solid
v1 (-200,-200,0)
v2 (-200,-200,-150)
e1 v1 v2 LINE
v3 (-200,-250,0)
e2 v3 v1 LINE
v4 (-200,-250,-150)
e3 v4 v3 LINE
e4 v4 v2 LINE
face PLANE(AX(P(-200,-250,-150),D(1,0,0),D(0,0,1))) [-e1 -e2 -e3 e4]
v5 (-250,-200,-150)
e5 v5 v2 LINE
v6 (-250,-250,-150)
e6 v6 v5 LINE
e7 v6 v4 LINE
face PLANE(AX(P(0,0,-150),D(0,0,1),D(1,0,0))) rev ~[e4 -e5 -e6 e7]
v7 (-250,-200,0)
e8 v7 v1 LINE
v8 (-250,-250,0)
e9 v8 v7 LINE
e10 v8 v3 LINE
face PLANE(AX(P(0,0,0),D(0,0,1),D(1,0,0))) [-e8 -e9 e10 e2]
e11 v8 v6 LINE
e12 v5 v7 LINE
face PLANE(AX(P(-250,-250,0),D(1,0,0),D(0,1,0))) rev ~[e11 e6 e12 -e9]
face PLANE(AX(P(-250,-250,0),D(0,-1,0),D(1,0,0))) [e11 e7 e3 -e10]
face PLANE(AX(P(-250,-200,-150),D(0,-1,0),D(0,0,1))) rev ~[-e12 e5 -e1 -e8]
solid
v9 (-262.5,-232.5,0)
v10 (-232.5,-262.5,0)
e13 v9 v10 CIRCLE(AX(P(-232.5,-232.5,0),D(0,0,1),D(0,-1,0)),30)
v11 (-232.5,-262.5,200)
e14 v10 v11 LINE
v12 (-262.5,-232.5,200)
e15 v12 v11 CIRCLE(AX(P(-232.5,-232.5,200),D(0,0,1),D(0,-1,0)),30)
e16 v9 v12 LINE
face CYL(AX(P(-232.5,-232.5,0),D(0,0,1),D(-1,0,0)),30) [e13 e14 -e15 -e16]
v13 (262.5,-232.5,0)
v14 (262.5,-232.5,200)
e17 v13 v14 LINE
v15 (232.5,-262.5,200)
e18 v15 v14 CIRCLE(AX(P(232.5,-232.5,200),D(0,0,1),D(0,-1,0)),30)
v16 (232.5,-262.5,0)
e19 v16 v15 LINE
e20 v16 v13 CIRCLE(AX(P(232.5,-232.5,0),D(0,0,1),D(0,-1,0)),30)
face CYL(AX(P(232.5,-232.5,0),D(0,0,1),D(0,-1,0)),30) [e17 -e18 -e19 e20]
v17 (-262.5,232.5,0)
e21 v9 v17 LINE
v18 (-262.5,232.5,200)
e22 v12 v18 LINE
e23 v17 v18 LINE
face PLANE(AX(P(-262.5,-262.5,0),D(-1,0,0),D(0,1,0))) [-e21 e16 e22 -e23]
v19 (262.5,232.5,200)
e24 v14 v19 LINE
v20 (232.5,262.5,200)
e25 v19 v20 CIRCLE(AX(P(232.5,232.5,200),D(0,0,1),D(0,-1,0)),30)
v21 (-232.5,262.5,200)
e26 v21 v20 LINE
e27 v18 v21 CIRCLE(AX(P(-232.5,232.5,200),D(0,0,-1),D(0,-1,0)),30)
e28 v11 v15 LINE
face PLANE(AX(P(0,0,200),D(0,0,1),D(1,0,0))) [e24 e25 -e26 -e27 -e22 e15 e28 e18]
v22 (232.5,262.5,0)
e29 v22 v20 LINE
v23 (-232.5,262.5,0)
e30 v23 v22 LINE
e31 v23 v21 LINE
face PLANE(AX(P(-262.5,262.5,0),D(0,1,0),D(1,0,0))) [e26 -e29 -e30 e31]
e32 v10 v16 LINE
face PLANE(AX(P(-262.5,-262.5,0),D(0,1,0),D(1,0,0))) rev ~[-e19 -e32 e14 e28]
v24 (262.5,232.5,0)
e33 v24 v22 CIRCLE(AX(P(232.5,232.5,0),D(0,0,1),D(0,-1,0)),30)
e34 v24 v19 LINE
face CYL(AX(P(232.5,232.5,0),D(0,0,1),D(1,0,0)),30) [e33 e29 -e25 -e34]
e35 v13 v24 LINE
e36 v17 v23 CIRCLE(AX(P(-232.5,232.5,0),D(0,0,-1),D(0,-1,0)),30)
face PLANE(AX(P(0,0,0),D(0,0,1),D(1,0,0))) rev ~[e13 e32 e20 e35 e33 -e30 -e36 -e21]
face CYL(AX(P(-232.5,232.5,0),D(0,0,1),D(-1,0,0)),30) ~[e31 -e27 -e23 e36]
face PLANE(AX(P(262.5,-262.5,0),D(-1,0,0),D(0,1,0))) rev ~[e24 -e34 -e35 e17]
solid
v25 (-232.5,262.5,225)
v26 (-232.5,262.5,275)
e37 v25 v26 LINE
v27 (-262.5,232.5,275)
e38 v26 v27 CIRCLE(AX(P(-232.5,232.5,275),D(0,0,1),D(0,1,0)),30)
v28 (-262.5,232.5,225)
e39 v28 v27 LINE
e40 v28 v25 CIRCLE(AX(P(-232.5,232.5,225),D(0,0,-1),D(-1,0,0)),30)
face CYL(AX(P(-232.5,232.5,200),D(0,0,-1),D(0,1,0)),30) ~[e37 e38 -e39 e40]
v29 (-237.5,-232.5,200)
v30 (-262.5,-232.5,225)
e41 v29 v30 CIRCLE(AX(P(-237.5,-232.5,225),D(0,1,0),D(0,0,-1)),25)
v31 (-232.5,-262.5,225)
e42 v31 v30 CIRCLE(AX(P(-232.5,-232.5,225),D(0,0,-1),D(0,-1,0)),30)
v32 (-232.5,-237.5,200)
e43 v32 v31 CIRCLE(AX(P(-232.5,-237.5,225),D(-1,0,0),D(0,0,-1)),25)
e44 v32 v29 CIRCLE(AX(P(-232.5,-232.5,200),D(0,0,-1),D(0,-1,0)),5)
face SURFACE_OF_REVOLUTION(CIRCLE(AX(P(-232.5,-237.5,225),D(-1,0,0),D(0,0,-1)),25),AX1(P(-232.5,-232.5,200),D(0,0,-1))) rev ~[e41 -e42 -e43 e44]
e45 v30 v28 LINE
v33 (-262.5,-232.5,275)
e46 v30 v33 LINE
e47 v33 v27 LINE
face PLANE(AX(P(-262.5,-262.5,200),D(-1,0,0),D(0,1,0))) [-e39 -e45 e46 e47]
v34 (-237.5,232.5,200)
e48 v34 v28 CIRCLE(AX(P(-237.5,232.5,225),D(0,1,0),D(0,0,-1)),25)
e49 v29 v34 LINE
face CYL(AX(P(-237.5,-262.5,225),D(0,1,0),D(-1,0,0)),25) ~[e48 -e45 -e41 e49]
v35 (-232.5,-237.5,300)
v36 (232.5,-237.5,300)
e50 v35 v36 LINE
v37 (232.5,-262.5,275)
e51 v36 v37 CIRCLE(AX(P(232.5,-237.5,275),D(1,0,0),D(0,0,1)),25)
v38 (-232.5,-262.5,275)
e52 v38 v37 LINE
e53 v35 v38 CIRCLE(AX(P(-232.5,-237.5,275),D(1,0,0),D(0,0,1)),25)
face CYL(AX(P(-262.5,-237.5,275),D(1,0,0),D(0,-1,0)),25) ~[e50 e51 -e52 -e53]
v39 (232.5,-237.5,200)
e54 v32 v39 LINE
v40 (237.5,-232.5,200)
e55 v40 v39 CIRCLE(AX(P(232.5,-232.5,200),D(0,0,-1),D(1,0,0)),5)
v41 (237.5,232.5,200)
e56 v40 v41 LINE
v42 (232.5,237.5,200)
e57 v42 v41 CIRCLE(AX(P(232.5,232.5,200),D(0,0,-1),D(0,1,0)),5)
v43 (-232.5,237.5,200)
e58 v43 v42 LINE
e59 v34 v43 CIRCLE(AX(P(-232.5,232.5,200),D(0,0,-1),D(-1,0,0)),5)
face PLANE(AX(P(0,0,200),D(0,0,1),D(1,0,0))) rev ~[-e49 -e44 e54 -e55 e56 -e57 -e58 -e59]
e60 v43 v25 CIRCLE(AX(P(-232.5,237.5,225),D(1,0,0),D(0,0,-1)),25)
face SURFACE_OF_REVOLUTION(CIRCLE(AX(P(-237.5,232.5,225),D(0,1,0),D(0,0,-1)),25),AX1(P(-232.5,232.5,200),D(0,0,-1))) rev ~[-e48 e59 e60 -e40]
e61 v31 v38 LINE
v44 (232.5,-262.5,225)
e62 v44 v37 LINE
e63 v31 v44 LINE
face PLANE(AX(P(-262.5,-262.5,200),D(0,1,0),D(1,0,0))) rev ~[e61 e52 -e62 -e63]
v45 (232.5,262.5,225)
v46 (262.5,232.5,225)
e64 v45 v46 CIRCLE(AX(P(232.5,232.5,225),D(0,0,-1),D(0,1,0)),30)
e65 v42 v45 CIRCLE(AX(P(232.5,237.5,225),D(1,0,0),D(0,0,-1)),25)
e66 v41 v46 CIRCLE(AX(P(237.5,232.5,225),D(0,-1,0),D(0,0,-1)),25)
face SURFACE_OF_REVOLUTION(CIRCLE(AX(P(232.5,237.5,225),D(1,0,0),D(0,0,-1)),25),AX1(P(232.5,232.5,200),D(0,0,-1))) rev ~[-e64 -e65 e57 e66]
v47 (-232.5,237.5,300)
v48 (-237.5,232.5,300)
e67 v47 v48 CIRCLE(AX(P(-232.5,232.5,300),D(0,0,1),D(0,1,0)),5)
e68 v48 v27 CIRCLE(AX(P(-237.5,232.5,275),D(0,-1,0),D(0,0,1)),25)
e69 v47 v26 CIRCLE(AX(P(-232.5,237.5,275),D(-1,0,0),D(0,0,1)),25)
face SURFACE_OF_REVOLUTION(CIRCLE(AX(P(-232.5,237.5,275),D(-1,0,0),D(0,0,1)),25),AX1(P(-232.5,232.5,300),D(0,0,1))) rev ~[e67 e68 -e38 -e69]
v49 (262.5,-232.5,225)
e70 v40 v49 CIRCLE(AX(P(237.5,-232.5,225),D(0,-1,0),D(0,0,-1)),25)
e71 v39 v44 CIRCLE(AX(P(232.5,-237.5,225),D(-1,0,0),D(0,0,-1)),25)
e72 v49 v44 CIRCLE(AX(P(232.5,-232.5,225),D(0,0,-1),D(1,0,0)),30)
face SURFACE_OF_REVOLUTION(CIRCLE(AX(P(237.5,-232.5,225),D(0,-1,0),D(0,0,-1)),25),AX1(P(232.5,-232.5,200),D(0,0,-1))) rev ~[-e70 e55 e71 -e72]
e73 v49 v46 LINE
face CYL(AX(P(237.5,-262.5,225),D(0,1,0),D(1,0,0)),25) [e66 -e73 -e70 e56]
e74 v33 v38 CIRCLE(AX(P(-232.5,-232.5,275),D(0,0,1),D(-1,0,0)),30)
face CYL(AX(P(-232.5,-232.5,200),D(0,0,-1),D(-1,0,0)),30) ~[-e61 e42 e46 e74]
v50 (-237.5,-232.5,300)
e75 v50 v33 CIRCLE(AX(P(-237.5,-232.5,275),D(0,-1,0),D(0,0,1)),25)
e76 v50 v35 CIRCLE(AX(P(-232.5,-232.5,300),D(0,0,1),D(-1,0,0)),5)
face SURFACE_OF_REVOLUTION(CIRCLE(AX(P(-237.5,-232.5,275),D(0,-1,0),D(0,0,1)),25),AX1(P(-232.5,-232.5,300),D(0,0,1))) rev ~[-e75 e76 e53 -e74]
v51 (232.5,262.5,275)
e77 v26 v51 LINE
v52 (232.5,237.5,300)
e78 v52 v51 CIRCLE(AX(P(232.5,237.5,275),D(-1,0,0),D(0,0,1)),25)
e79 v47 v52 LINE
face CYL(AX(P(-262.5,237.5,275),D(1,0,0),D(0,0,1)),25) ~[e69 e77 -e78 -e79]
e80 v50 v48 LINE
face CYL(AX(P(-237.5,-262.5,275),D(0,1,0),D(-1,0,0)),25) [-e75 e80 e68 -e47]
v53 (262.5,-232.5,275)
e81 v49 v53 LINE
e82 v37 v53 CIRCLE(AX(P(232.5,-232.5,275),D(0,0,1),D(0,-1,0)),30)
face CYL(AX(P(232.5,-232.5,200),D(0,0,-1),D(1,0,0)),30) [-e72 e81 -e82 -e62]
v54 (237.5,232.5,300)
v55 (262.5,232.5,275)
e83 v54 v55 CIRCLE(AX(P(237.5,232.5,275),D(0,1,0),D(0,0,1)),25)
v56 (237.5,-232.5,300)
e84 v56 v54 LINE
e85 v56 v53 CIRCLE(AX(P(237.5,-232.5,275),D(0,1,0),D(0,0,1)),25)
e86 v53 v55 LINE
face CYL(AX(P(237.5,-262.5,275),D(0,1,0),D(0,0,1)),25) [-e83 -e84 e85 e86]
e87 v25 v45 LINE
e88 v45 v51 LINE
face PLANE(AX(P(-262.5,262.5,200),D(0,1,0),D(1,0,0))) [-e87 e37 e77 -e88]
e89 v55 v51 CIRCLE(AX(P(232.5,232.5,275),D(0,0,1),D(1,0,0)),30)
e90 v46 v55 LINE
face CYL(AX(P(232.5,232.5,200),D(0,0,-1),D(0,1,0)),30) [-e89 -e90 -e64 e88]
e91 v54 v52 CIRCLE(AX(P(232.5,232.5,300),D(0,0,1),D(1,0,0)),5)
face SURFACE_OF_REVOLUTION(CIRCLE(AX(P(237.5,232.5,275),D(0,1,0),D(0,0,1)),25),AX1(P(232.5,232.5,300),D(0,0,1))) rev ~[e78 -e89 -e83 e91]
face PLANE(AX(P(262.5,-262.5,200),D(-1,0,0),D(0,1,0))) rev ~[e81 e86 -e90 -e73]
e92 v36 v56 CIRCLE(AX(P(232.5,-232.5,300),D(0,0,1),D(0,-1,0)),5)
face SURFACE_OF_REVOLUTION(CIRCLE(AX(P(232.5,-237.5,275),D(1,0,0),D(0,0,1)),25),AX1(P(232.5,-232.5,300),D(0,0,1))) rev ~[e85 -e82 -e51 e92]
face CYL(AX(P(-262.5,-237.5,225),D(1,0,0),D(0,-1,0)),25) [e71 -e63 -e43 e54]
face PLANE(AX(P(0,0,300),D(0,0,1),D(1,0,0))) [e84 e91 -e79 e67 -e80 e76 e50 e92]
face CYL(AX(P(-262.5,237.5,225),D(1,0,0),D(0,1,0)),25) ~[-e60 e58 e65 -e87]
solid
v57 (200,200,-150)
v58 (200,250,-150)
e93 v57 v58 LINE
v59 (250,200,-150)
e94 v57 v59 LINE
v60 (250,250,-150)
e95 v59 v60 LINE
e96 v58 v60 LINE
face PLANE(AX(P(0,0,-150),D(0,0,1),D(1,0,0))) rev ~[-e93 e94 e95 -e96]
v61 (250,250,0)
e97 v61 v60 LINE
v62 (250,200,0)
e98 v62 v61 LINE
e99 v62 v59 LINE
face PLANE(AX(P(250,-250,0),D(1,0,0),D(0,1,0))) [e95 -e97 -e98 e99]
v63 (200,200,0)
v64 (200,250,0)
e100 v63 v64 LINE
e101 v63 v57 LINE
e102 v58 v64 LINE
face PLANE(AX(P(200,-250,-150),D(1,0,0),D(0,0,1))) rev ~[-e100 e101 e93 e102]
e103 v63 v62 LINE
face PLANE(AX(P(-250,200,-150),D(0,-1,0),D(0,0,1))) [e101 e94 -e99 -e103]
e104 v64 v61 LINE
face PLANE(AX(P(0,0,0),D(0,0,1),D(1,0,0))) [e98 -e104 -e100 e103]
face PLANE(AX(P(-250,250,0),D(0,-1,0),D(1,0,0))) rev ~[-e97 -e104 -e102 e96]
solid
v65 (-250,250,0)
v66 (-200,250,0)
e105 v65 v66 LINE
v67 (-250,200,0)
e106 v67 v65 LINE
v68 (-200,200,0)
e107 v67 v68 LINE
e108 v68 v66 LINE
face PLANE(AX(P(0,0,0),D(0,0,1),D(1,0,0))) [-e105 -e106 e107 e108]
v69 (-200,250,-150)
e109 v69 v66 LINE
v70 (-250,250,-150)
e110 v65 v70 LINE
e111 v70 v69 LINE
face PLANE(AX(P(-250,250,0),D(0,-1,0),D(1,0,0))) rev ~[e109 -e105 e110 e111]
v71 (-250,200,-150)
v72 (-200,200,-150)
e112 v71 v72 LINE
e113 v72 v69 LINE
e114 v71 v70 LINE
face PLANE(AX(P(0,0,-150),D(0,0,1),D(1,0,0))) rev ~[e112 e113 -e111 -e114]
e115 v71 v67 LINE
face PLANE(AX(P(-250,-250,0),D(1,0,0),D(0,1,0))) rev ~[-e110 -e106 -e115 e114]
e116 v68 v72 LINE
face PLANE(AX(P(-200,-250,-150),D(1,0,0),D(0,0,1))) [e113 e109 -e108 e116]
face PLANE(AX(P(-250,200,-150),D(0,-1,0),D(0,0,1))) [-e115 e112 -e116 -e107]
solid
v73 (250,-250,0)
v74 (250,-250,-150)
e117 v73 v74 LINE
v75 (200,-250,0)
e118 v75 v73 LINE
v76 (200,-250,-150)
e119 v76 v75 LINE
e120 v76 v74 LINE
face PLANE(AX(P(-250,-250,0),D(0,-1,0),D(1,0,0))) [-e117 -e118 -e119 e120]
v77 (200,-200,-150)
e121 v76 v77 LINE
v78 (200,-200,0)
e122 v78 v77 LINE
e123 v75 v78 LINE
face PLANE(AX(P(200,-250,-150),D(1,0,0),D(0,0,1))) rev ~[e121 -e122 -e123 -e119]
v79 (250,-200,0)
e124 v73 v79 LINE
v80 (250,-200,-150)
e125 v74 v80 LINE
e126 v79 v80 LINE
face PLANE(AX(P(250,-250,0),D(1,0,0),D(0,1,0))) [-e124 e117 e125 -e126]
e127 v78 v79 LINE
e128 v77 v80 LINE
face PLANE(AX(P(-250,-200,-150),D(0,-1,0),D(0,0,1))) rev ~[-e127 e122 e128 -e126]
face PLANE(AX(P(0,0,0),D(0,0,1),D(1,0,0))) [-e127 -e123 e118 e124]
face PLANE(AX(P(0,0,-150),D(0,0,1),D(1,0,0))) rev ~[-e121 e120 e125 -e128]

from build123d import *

# Parameters (mm, degrees)
F0_W          = 500
F0_H          = 500
F1_DEPTH      = 150
F2_W          = 400
F2_H          = 150
F3_DEPTH      = 500.001
F4_W          = 400
F4_H          = 150
F5_DEPTH      = 500.001
F6_W          = 400
F6_H          = 150
F7_DEPTH      = 500.001
F8_W          = 525
F8_H          = 525
F9_DEPTH      = 200
F11_W         = 525
F11_H         = 525
F12_DEPTH     = 100
F13_R         = 25
F14_R         = 25
F15_T1_DEPTH  = 100
F15_T4_ANGLE  = 90
F15_T6_ANGLE  = 90
F15_T8_ANGLE  = 90
F15_T10_ANGLE = 90
F15_T12_ANGLE = 90
F15_T14_ANGLE = 90
F15_T16_ANGLE = 90
F15_T18_ANGLE = 90
F15_2_F1_R    = 30
F15_2_F2_R    = 30
F15_2_F3_R    = 30
F15_2_F4_R    = 30


# Not quite as in the source:
# - a fillet or chamfer that OpenCascade refuses, or shapes differently, is made with other operations: its cross-section is extruded or revolved along the edge and cut away or added


with BuildPart() as f1:
    # F0 (on Top) → F1 (new body)
    with BuildSketch(Plane.XY):
        Rectangle(F0_W, F0_H)
    extrude(amount=-F1_DEPTH)

    # F2 (on face) → F3 (cut, through all)
    with BuildSketch(Plane.XZ.offset(250)):
        with Locations((0, -75)):
            Rectangle(F2_W, F2_H)
    extrude(amount=-F3_DEPTH, mode=Mode.SUBTRACT)

    # F4 (on face) → F5 (cut, through all)
    with BuildSketch(Plane(origin=(-250, 0, 0), x_dir=(0, -1, 0), z_dir=(-1, 0, 0))):
        with Locations((0, -75)):
            Rectangle(F4_W, F4_H)
    extrude(amount=-F5_DEPTH, mode=Mode.SUBTRACT)

    # F6 (on face) → F7 (cut, through all)
    with BuildSketch(Plane.YZ.offset(250)):
        with Locations((0, -75)):
            Rectangle(F6_W, F6_H)
    extrude(amount=-F7_DEPTH, mode=Mode.SUBTRACT)


with BuildPart() as f9:
    # F8 (on Top) → F9 (new body)
    with BuildSketch(Plane.XY):
        Rectangle(F8_W, F8_H)
    extrude(amount=F9_DEPTH)

    # F15#2: fillet of radius 30 on 4 edges, made by hand

    # F15_2_f1
    f15_2_f1_edges = [f9.edges().sort_by_distance(p)[0] for p in [
        (-262.5, 262.5, 100),
    ]]
    fillet(f15_2_f1_edges, radius=F15_2_F1_R)

    # F15_2_f2
    f15_2_f2_edges = [f9.edges().sort_by_distance(p)[0] for p in [
        (-262.5, -262.5, 100),
    ]]
    fillet(f15_2_f2_edges, radius=F15_2_F2_R)

    # F15_2_f3
    f15_2_f3_edges = [f9.edges().sort_by_distance(p)[0] for p in [
        (262.5, -262.5, 100),
    ]]
    fillet(f15_2_f3_edges, radius=F15_2_F3_R)

    # F15_2_f4
    f15_2_f4_edges = [f9.edges().sort_by_distance(p)[0] for p in [
        (262.5, 262.5, 100),
    ]]
    fillet(f15_2_f4_edges, radius=F15_2_F4_R)


with BuildPart() as f12:
    # F11 (on face) → F12 (new body)
    with BuildSketch(Plane.XY.offset(200)):
        Rectangle(F11_W, F11_H)
    extrude(amount=F12_DEPTH)

    # F13
    f13_edges = [f12.edges().sort_by_distance(p)[0] for p in [
        (0, 262.5, 200),
        (262.5, 0, 200),
        (-262.5, 0, 200),
        (0, -262.5, 200),
    ]]
    fillet(f13_edges, radius=F13_R)

    # F14
    f14_edges = [f12.edges().sort_by_distance(p)[0] for p in [
        (0, 262.5, 300),
        (262.5, 0, 300),
        (-262.5, 0, 300),
        (0, -262.5, 300),
    ]]
    fillet(f14_edges, radius=F14_R)

    # F15: fillet of radius 30 on 4 edges, made by hand

    # F15_s2 → F15_t1 (cut)
    with BuildSketch(Plane.XY.offset(200)):
        with BuildLine():
            ThreePointArc((-232.5, 262.5), (-253.7132034356, 253.7132034356), (-262.5, 232.5))
            Line((-262.5, 232.5), (-262.5, 262.5))
            Line((-262.5, 262.5), (-232.5, 262.5))
        make_face()
        with BuildLine():
            ThreePointArc((232.5, 262.5), (253.7132034356, 253.7132034356), (262.5, 232.5))
            Line((262.5, 232.5), (262.5, 262.5))
            Line((262.5, 262.5), (232.5, 262.5))
        make_face()
        with BuildLine():
            ThreePointArc((262.5, -232.5), (253.7132034356, -253.7132034356), (232.5, -262.5))
            Line((232.5, -262.5), (262.5, -262.5))
            Line((262.5, -262.5), (262.5, -232.5))
        make_face()
        with BuildLine():
            ThreePointArc((-262.5, -232.5), (-253.7132034356, -253.7132034356), (-232.5, -262.5))
            Line((-232.5, -262.5), (-262.5, -262.5))
            Line((-262.5, -262.5), (-262.5, -232.5))
        make_face()
    extrude(amount=F15_T1_DEPTH, mode=Mode.SUBTRACT)

    # F15_s3 → F15_t4 (revolve, cut)
    with BuildSketch(Plane.YZ.offset(-232.5)):
        with BuildLine():
            ThreePointArc((-237.5, 200), (-255.1776695297, 207.3223304703), (-262.5, 225))
            Line((-262.5, 225), (-262.5, 200))
            Line((-262.5, 200), (-237.5, 200))
        make_face()
    revolve(axis=Axis((-232.5, -232.5, 200), (0, 0, -1)), revolution_arc=F15_T4_ANGLE, mode=Mode.SUBTRACT)

    # F15_s5 → F15_t6 (revolve, cut)
    with BuildSketch(Plane.XZ.offset(232.5)):
        with BuildLine():
            ThreePointArc((-237.5, 300), (-255.1776695297, 292.6776695297), (-262.5, 275))
            Line((-262.5, 275), (-262.5, 300))
            Line((-262.5, 300), (-237.5, 300))
        make_face()
    revolve(axis=Axis((-232.5, -232.5, 300), (0, 0, 1)), revolution_arc=F15_T6_ANGLE, mode=Mode.SUBTRACT)

    # F15_s7 → F15_t8 (revolve, cut)
    with BuildSketch(Plane.XZ.offset(232.5)):
        with BuildLine():
            ThreePointArc((237.5, 200), (255.1776695297, 207.3223304703), (262.5, 225))
            Line((262.5, 225), (262.5, 200))
            Line((262.5, 200), (237.5, 200))
        make_face()
    revolve(axis=Axis((232.5, -232.5, 200), (0, 0, -1)), revolution_arc=F15_T8_ANGLE, mode=Mode.SUBTRACT)

    # F15_s9 → F15_t10 (revolve, cut)
    with BuildSketch(Plane.YZ.offset(232.5)):
        with BuildLine():
            ThreePointArc((-237.5, 300), (-255.1776695297, 292.6776695297), (-262.5, 275))
            Line((-262.5, 275), (-262.5, 300))
            Line((-262.5, 300), (-237.5, 300))
        make_face()
    revolve(axis=Axis((232.5, -232.5, 300), (0, 0, 1)), revolution_arc=F15_T10_ANGLE, mode=Mode.SUBTRACT)

    # F15_s11 → F15_t12 (revolve, cut)
    with BuildSketch(Plane.YZ.offset(232.5)):
        with BuildLine():
            ThreePointArc((237.5, 200), (255.1776695297, 207.3223304703), (262.5, 225))
            Line((262.5, 225), (262.5, 200))
            Line((262.5, 200), (237.5, 200))
        make_face()
    revolve(axis=Axis((232.5, 232.5, 200), (0, 0, -1)), revolution_arc=F15_T12_ANGLE, mode=Mode.SUBTRACT)

    # F15_s13 → F15_t14 (revolve, cut)
    with BuildSketch(Plane.XZ.offset(-232.5)):
        with BuildLine():
            ThreePointArc((237.5, 300), (255.1776695297, 292.6776695297), (262.5, 275))
            Line((262.5, 275), (262.5, 300))
            Line((262.5, 300), (237.5, 300))
        make_face()
    revolve(axis=Axis((232.5, 232.5, 300), (0, 0, 1)), revolution_arc=F15_T14_ANGLE, mode=Mode.SUBTRACT)

    # F15_s15 → F15_t16 (revolve, cut)
    with BuildSketch(Plane.XZ.offset(-232.5)):
        with BuildLine():
            ThreePointArc((-237.5, 200), (-255.1776695297, 207.3223304703), (-262.5, 225))
            Line((-262.5, 225), (-262.5, 200))
            Line((-262.5, 200), (-237.5, 200))
        make_face()
    revolve(axis=Axis((-232.5, 232.5, 200), (0, 0, -1)), revolution_arc=F15_T16_ANGLE, mode=Mode.SUBTRACT)

    # F15_s17 → F15_t18 (revolve, cut)
    with BuildSketch(Plane.YZ.offset(-232.5)):
        with BuildLine():
            ThreePointArc((237.5, 300), (255.1776695297, 292.6776695297), (262.5, 275))
            Line((262.5, 275), (262.5, 300))
            Line((262.5, 300), (237.5, 300))
        make_face()
    revolve(axis=Axis((-232.5, 232.5, 300), (0, 0, 1)), revolution_arc=F15_T18_ANGLE, mode=Mode.SUBTRACT)


solid = Compound([f1.part, f9.part, f12.part])
